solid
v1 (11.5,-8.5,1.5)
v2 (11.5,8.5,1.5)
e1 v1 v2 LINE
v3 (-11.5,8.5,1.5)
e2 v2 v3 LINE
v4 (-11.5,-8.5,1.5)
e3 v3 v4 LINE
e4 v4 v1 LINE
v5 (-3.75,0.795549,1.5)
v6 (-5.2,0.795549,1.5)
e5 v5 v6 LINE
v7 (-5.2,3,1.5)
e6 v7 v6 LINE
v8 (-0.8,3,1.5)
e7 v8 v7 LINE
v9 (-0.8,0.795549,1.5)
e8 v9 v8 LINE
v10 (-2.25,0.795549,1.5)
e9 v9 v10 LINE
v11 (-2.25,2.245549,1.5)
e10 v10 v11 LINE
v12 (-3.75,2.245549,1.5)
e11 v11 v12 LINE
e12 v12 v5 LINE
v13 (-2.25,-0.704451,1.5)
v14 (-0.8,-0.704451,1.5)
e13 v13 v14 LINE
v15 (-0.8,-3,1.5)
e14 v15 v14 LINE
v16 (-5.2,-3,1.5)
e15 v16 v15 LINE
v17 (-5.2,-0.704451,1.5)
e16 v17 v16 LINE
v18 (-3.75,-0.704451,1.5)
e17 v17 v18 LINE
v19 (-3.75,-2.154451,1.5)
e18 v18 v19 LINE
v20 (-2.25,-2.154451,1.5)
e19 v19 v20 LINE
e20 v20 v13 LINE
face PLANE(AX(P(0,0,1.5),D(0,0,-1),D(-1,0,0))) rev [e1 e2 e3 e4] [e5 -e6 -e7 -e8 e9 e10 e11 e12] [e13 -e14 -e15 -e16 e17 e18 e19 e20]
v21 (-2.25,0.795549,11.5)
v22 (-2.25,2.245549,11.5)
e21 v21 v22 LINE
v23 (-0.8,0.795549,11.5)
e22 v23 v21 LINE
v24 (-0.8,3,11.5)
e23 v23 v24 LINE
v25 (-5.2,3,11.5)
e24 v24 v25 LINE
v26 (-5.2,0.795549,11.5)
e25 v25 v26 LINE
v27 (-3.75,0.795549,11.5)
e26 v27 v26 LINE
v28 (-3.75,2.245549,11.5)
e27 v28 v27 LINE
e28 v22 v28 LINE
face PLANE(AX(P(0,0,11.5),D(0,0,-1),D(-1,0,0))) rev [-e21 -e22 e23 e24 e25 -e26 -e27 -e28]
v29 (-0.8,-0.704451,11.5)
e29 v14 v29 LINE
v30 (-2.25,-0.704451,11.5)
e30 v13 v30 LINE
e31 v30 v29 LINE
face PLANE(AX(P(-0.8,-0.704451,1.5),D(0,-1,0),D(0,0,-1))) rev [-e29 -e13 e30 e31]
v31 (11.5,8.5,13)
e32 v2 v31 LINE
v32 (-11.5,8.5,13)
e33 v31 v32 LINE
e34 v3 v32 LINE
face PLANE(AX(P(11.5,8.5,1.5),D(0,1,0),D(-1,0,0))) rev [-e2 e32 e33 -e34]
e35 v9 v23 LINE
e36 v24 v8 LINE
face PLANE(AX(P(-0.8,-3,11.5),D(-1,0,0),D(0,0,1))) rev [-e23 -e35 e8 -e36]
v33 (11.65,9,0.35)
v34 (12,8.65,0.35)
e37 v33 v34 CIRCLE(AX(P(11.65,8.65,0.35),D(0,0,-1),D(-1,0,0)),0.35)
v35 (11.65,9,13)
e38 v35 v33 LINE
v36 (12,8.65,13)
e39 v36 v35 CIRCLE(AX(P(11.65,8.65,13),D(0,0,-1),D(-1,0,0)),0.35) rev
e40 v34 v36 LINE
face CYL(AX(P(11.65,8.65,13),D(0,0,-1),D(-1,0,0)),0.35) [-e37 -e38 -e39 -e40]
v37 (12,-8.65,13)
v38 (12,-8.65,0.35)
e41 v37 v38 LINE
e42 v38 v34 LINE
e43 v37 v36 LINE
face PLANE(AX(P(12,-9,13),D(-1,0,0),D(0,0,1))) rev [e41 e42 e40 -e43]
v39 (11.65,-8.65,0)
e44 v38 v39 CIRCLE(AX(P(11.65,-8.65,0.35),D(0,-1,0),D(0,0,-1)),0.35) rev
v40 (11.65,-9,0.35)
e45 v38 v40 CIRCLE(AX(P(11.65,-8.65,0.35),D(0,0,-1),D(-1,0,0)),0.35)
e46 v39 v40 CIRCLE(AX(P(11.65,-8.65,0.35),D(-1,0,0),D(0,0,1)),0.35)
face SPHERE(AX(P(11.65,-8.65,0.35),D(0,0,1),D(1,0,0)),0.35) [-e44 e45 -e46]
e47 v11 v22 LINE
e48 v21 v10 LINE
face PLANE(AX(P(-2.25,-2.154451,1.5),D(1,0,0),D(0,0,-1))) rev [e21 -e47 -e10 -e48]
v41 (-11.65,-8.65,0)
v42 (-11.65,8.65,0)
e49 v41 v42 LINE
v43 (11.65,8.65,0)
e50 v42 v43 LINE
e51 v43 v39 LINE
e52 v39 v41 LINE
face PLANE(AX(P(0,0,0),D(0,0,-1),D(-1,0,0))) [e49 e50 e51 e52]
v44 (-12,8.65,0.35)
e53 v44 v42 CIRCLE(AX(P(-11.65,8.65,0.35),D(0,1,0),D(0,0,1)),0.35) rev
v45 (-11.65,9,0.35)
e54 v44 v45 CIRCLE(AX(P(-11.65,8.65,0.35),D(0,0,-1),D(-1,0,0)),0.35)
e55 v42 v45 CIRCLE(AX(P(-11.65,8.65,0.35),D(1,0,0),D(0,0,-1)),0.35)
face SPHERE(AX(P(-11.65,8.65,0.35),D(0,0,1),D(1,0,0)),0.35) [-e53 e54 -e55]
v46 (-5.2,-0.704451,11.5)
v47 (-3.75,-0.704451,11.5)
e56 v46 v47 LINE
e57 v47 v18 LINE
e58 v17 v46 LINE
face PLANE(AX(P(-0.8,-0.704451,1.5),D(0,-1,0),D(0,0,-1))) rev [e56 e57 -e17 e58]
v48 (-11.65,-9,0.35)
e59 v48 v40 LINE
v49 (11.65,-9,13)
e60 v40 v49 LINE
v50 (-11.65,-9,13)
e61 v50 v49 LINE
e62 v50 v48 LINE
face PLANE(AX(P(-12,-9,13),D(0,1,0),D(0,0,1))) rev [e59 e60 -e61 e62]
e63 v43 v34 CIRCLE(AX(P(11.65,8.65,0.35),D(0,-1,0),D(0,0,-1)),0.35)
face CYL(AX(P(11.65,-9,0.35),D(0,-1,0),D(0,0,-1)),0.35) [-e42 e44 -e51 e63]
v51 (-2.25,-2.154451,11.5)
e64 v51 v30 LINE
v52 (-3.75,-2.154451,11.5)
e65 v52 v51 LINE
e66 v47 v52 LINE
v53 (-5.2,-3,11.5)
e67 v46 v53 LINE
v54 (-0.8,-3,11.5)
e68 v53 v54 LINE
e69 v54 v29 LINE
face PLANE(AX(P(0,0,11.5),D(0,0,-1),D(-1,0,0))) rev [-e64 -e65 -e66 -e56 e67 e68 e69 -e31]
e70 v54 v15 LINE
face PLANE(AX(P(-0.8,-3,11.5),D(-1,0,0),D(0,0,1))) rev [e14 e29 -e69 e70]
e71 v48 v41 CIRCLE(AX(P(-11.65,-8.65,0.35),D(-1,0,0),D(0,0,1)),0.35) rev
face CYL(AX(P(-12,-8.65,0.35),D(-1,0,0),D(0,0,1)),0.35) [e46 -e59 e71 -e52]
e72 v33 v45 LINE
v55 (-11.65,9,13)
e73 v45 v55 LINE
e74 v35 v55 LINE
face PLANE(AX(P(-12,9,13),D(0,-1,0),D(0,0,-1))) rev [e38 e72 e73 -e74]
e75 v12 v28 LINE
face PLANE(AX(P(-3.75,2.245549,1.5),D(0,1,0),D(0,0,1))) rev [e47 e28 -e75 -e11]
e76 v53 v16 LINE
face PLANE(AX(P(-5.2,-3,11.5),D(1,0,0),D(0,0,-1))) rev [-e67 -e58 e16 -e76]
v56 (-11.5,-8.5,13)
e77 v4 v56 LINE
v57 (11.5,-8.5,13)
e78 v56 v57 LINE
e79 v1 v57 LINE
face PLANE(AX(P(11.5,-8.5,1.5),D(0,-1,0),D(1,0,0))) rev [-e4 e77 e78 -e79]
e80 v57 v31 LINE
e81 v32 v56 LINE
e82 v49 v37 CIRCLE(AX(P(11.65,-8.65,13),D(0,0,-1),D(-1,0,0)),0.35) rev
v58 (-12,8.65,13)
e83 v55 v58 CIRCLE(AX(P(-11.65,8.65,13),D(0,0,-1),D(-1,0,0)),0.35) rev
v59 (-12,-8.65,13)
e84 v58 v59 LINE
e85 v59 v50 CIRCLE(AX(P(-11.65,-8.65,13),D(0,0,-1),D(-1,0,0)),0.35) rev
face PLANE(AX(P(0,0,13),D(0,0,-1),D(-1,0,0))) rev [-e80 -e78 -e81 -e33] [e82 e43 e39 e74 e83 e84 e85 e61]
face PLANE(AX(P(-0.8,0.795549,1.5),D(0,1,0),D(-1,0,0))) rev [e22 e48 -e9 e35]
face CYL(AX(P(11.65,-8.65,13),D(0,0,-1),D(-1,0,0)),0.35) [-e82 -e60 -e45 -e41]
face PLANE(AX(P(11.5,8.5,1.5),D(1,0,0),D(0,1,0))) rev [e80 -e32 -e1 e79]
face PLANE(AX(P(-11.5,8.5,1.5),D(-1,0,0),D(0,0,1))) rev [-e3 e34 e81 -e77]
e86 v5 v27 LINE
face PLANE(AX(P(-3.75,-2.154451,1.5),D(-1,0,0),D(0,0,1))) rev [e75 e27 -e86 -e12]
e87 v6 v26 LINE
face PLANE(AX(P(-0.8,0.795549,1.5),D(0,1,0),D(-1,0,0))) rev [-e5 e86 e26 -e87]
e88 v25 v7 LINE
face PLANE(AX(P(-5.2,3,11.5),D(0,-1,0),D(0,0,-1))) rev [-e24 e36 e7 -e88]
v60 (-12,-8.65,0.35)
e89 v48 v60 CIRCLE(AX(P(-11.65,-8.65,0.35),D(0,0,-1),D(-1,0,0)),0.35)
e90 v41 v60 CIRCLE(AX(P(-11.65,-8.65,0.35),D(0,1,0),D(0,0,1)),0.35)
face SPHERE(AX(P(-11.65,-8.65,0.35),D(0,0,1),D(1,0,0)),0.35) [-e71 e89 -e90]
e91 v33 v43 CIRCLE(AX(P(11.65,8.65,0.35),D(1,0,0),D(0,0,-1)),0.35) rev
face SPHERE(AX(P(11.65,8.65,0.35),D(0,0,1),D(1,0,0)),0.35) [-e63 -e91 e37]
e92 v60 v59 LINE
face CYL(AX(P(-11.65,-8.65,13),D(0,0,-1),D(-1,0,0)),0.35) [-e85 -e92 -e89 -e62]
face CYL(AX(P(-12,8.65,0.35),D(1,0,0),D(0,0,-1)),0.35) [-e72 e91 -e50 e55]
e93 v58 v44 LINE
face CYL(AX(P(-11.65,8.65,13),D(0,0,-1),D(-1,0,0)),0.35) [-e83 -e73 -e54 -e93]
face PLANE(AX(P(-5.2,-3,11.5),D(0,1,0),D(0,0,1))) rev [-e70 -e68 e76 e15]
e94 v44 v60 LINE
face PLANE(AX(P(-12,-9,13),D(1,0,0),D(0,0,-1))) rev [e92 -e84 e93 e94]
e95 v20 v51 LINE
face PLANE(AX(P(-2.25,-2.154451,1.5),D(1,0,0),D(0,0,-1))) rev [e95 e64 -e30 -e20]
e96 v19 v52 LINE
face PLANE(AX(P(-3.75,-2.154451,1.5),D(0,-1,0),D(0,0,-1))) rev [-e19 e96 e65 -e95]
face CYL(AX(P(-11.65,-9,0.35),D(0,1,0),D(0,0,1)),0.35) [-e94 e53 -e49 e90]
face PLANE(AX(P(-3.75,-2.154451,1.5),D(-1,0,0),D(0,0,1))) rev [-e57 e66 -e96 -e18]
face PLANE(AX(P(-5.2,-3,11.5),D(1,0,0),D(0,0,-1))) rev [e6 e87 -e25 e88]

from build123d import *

# Parameters (mm, degrees)
SKETCH1_W           = 24
SKETCH1_H           = 18
BOSS_EXTRUDE1_DEPTH = 13
FILLET1_R           = 0.35
FILLET2_R           = 0.35
SKETCH2_W           = 23
SKETCH2_H           = 17
CUT_EXTRUDE1_DEPTH  = 11.5
SKETCH11_W          = 4.4
SKETCH11_H          = 6
BOSS_EXTRUDE4_DEPTH = 10
SKETCH12_W          = 4.4
SKETCH12_H          = 1.5
CUT_EXTRUDE6_DEPTH  = 10
SKETCH13_W          = 1.5
SKETCH13_H          = 4.4
CUT_EXTRUDE7_DEPTH  = 10


with BuildPart() as part:
    # Sketch1 → Boss-Extrude1 (new body)
    with BuildSketch(Plane.XY):
        Rectangle(SKETCH1_W, SKETCH1_H)
    extrude(amount=BOSS_EXTRUDE1_DEPTH)

    # Fillet1
    fillet1_edges = [part.edges().sort_by_distance(p)[0] for p in [
        (0, -9, 0),
        (-12, 0, 0),
        (0, 9, 0),
        (12, 0, 0),
    ]]
    fillet(fillet1_edges, radius=FILLET1_R)

    # Fillet2
    # the kernel refuses this fillet: 0.35 mm, written as the material it takes off along each edge
    with BuildSketch(Plane(origin=(11.65, 8.65, 0.35), x_dir=(0, 1, 0), z_dir=(1, 0, 0))) as fillet2_piece_1_section:
        Polygon((0, 0), (FILLET2_R, 0), (FILLET2_R, -FILLET2_R), (0, -FILLET2_R), align=None)
    fillet2_piece_1 = extrude(amount=FILLET2_R, mode=Mode.PRIVATE)
    fillet2_piece_1 = fillet2_piece_1 - Plane(origin=(11.65, 8.65, 0.35), x_dir=(0, -0.7071067811865475, 0.7071067811865475), z_dir=(1, 0, 0)) * Sphere(FILLET2_R, mode=Mode.PRIVATE)
    add(fillet2_piece_1, mode=Mode.SUBTRACT)
    with BuildSketch(Plane(origin=(11.65, -8.65, 0.35), x_dir=(1, 0, 0), z_dir=(0, -1, 0))) as fillet2_piece_2_section:
        Polygon((0, 0), (FILLET2_R, 0), (FILLET2_R, -FILLET2_R), (0, -FILLET2_R), align=None)
    fillet2_piece_2 = extrude(amount=FILLET2_R, mode=Mode.PRIVATE)
    fillet2_piece_2 = fillet2_piece_2 - Plane(origin=(11.65, -8.65, 0.35), x_dir=(-0.7071067811865475, 0, 0.7071067811865475), z_dir=(0, -1, 0)) * Sphere(FILLET2_R, mode=Mode.PRIVATE)
    add(fillet2_piece_2, mode=Mode.SUBTRACT)
    with BuildSketch(Plane(origin=(-11.65, 8.65, 0.35), x_dir=(0, 1, 0), z_dir=(-1, 0, 0))) as fillet2_piece_3_section:
        Polygon((0, 0), (FILLET2_R, 0), (FILLET2_R, FILLET2_R), (0, FILLET2_R), align=None)
    fillet2_piece_3 = extrude(amount=FILLET2_R, mode=Mode.PRIVATE)
    fillet2_piece_3 = fillet2_piece_3 - Plane(origin=(-11.65, 8.65, 0.35), x_dir=(0, -0.7071067811865475, 0.7071067811865475), z_dir=(-1, 0, 0)) * Sphere(FILLET2_R, mode=Mode.PRIVATE)
    add(fillet2_piece_3, mode=Mode.SUBTRACT)
    with BuildSketch(Plane(origin=(-11.65, -8.65, 0.35), x_dir=(-1, 0, 0), z_dir=(0, -1, 0))) as fillet2_piece_4_section:
        Polygon((0, 0), (FILLET2_R, 0), (FILLET2_R, FILLET2_R), (0, FILLET2_R), align=None)
    fillet2_piece_4 = extrude(amount=FILLET2_R, mode=Mode.PRIVATE)
    fillet2_piece_4 = fillet2_piece_4 - Plane(origin=(-11.65, -8.65, 0.35), x_dir=(0.7071067811865475, 0, 0.7071067811865475), z_dir=(0, -1, 0)) * Sphere(FILLET2_R, mode=Mode.PRIVATE)
    add(fillet2_piece_4, mode=Mode.SUBTRACT)
    with BuildSketch(Plane(origin=(12, -9, 0.35), x_dir=(-1, 0, 0), z_dir=(0, 0, 1)), Plane(origin=(12, 9, 0.35), x_dir=(0, -1, 0), z_dir=(0, 0, 1))) as fillet2_piece_5:
        with BuildLine():
            CenterArc((FILLET2_R, -FILLET2_R), FILLET2_R, 90, 90)
            Line((0, -FILLET2_R), (0, 0))
            Line((0, 0), (FILLET2_R, 0))
        make_face()
    extrude(amount=13.525, mode=Mode.SUBTRACT)
    with BuildSketch(Plane(origin=(-12, -9, 0.35), x_dir=(1, 0, 0), z_dir=(0, 0, 1)), Plane(origin=(-12, 9, 0.35), x_dir=(0, -1, 0), z_dir=(0, 0, 1))) as fillet2_piece_6:
        with BuildLine():
            CenterArc((FILLET2_R, FILLET2_R), FILLET2_R, 180, 90)
            Line((0, FILLET2_R), (0, 0))
            Line((0, 0), (FILLET2_R, 0))
        make_face()
    extrude(amount=13.525, mode=Mode.SUBTRACT)

    # Sketch2 → Cut-Extrude1 (cut)
    with BuildSketch(Plane.XY.offset(13)):
        Rectangle(SKETCH2_W, SKETCH2_H)
    extrude(amount=-CUT_EXTRUDE1_DEPTH, mode=Mode.SUBTRACT)

    # Sketch11 → Boss-Extrude4 (add)
    with BuildSketch(Plane.XY.offset(1.5)):
        with Locations((-3, 0)):
            Rectangle(SKETCH11_W, SKETCH11_H)
    extrude(amount=BOSS_EXTRUDE4_DEPTH)

    # Sketch12 → Cut-Extrude6 (cut)
    with BuildSketch(Plane.XY.offset(11.5)):
        with Locations((-3, 0.045549291)):
            Rectangle(SKETCH12_W, SKETCH12_H)
    extrude(amount=-CUT_EXTRUDE6_DEPTH, mode=Mode.SUBTRACT)

    # Sketch13 → Cut-Extrude7 (cut)
    with BuildSketch(Plane.XY.offset(11.5)):
        with Locations((-3, 0.045549291)):
            Rectangle(SKETCH13_W, SKETCH13_H)
    extrude(amount=-CUT_EXTRUDE7_DEPTH, mode=Mode.SUBTRACT)


solid = part.part
